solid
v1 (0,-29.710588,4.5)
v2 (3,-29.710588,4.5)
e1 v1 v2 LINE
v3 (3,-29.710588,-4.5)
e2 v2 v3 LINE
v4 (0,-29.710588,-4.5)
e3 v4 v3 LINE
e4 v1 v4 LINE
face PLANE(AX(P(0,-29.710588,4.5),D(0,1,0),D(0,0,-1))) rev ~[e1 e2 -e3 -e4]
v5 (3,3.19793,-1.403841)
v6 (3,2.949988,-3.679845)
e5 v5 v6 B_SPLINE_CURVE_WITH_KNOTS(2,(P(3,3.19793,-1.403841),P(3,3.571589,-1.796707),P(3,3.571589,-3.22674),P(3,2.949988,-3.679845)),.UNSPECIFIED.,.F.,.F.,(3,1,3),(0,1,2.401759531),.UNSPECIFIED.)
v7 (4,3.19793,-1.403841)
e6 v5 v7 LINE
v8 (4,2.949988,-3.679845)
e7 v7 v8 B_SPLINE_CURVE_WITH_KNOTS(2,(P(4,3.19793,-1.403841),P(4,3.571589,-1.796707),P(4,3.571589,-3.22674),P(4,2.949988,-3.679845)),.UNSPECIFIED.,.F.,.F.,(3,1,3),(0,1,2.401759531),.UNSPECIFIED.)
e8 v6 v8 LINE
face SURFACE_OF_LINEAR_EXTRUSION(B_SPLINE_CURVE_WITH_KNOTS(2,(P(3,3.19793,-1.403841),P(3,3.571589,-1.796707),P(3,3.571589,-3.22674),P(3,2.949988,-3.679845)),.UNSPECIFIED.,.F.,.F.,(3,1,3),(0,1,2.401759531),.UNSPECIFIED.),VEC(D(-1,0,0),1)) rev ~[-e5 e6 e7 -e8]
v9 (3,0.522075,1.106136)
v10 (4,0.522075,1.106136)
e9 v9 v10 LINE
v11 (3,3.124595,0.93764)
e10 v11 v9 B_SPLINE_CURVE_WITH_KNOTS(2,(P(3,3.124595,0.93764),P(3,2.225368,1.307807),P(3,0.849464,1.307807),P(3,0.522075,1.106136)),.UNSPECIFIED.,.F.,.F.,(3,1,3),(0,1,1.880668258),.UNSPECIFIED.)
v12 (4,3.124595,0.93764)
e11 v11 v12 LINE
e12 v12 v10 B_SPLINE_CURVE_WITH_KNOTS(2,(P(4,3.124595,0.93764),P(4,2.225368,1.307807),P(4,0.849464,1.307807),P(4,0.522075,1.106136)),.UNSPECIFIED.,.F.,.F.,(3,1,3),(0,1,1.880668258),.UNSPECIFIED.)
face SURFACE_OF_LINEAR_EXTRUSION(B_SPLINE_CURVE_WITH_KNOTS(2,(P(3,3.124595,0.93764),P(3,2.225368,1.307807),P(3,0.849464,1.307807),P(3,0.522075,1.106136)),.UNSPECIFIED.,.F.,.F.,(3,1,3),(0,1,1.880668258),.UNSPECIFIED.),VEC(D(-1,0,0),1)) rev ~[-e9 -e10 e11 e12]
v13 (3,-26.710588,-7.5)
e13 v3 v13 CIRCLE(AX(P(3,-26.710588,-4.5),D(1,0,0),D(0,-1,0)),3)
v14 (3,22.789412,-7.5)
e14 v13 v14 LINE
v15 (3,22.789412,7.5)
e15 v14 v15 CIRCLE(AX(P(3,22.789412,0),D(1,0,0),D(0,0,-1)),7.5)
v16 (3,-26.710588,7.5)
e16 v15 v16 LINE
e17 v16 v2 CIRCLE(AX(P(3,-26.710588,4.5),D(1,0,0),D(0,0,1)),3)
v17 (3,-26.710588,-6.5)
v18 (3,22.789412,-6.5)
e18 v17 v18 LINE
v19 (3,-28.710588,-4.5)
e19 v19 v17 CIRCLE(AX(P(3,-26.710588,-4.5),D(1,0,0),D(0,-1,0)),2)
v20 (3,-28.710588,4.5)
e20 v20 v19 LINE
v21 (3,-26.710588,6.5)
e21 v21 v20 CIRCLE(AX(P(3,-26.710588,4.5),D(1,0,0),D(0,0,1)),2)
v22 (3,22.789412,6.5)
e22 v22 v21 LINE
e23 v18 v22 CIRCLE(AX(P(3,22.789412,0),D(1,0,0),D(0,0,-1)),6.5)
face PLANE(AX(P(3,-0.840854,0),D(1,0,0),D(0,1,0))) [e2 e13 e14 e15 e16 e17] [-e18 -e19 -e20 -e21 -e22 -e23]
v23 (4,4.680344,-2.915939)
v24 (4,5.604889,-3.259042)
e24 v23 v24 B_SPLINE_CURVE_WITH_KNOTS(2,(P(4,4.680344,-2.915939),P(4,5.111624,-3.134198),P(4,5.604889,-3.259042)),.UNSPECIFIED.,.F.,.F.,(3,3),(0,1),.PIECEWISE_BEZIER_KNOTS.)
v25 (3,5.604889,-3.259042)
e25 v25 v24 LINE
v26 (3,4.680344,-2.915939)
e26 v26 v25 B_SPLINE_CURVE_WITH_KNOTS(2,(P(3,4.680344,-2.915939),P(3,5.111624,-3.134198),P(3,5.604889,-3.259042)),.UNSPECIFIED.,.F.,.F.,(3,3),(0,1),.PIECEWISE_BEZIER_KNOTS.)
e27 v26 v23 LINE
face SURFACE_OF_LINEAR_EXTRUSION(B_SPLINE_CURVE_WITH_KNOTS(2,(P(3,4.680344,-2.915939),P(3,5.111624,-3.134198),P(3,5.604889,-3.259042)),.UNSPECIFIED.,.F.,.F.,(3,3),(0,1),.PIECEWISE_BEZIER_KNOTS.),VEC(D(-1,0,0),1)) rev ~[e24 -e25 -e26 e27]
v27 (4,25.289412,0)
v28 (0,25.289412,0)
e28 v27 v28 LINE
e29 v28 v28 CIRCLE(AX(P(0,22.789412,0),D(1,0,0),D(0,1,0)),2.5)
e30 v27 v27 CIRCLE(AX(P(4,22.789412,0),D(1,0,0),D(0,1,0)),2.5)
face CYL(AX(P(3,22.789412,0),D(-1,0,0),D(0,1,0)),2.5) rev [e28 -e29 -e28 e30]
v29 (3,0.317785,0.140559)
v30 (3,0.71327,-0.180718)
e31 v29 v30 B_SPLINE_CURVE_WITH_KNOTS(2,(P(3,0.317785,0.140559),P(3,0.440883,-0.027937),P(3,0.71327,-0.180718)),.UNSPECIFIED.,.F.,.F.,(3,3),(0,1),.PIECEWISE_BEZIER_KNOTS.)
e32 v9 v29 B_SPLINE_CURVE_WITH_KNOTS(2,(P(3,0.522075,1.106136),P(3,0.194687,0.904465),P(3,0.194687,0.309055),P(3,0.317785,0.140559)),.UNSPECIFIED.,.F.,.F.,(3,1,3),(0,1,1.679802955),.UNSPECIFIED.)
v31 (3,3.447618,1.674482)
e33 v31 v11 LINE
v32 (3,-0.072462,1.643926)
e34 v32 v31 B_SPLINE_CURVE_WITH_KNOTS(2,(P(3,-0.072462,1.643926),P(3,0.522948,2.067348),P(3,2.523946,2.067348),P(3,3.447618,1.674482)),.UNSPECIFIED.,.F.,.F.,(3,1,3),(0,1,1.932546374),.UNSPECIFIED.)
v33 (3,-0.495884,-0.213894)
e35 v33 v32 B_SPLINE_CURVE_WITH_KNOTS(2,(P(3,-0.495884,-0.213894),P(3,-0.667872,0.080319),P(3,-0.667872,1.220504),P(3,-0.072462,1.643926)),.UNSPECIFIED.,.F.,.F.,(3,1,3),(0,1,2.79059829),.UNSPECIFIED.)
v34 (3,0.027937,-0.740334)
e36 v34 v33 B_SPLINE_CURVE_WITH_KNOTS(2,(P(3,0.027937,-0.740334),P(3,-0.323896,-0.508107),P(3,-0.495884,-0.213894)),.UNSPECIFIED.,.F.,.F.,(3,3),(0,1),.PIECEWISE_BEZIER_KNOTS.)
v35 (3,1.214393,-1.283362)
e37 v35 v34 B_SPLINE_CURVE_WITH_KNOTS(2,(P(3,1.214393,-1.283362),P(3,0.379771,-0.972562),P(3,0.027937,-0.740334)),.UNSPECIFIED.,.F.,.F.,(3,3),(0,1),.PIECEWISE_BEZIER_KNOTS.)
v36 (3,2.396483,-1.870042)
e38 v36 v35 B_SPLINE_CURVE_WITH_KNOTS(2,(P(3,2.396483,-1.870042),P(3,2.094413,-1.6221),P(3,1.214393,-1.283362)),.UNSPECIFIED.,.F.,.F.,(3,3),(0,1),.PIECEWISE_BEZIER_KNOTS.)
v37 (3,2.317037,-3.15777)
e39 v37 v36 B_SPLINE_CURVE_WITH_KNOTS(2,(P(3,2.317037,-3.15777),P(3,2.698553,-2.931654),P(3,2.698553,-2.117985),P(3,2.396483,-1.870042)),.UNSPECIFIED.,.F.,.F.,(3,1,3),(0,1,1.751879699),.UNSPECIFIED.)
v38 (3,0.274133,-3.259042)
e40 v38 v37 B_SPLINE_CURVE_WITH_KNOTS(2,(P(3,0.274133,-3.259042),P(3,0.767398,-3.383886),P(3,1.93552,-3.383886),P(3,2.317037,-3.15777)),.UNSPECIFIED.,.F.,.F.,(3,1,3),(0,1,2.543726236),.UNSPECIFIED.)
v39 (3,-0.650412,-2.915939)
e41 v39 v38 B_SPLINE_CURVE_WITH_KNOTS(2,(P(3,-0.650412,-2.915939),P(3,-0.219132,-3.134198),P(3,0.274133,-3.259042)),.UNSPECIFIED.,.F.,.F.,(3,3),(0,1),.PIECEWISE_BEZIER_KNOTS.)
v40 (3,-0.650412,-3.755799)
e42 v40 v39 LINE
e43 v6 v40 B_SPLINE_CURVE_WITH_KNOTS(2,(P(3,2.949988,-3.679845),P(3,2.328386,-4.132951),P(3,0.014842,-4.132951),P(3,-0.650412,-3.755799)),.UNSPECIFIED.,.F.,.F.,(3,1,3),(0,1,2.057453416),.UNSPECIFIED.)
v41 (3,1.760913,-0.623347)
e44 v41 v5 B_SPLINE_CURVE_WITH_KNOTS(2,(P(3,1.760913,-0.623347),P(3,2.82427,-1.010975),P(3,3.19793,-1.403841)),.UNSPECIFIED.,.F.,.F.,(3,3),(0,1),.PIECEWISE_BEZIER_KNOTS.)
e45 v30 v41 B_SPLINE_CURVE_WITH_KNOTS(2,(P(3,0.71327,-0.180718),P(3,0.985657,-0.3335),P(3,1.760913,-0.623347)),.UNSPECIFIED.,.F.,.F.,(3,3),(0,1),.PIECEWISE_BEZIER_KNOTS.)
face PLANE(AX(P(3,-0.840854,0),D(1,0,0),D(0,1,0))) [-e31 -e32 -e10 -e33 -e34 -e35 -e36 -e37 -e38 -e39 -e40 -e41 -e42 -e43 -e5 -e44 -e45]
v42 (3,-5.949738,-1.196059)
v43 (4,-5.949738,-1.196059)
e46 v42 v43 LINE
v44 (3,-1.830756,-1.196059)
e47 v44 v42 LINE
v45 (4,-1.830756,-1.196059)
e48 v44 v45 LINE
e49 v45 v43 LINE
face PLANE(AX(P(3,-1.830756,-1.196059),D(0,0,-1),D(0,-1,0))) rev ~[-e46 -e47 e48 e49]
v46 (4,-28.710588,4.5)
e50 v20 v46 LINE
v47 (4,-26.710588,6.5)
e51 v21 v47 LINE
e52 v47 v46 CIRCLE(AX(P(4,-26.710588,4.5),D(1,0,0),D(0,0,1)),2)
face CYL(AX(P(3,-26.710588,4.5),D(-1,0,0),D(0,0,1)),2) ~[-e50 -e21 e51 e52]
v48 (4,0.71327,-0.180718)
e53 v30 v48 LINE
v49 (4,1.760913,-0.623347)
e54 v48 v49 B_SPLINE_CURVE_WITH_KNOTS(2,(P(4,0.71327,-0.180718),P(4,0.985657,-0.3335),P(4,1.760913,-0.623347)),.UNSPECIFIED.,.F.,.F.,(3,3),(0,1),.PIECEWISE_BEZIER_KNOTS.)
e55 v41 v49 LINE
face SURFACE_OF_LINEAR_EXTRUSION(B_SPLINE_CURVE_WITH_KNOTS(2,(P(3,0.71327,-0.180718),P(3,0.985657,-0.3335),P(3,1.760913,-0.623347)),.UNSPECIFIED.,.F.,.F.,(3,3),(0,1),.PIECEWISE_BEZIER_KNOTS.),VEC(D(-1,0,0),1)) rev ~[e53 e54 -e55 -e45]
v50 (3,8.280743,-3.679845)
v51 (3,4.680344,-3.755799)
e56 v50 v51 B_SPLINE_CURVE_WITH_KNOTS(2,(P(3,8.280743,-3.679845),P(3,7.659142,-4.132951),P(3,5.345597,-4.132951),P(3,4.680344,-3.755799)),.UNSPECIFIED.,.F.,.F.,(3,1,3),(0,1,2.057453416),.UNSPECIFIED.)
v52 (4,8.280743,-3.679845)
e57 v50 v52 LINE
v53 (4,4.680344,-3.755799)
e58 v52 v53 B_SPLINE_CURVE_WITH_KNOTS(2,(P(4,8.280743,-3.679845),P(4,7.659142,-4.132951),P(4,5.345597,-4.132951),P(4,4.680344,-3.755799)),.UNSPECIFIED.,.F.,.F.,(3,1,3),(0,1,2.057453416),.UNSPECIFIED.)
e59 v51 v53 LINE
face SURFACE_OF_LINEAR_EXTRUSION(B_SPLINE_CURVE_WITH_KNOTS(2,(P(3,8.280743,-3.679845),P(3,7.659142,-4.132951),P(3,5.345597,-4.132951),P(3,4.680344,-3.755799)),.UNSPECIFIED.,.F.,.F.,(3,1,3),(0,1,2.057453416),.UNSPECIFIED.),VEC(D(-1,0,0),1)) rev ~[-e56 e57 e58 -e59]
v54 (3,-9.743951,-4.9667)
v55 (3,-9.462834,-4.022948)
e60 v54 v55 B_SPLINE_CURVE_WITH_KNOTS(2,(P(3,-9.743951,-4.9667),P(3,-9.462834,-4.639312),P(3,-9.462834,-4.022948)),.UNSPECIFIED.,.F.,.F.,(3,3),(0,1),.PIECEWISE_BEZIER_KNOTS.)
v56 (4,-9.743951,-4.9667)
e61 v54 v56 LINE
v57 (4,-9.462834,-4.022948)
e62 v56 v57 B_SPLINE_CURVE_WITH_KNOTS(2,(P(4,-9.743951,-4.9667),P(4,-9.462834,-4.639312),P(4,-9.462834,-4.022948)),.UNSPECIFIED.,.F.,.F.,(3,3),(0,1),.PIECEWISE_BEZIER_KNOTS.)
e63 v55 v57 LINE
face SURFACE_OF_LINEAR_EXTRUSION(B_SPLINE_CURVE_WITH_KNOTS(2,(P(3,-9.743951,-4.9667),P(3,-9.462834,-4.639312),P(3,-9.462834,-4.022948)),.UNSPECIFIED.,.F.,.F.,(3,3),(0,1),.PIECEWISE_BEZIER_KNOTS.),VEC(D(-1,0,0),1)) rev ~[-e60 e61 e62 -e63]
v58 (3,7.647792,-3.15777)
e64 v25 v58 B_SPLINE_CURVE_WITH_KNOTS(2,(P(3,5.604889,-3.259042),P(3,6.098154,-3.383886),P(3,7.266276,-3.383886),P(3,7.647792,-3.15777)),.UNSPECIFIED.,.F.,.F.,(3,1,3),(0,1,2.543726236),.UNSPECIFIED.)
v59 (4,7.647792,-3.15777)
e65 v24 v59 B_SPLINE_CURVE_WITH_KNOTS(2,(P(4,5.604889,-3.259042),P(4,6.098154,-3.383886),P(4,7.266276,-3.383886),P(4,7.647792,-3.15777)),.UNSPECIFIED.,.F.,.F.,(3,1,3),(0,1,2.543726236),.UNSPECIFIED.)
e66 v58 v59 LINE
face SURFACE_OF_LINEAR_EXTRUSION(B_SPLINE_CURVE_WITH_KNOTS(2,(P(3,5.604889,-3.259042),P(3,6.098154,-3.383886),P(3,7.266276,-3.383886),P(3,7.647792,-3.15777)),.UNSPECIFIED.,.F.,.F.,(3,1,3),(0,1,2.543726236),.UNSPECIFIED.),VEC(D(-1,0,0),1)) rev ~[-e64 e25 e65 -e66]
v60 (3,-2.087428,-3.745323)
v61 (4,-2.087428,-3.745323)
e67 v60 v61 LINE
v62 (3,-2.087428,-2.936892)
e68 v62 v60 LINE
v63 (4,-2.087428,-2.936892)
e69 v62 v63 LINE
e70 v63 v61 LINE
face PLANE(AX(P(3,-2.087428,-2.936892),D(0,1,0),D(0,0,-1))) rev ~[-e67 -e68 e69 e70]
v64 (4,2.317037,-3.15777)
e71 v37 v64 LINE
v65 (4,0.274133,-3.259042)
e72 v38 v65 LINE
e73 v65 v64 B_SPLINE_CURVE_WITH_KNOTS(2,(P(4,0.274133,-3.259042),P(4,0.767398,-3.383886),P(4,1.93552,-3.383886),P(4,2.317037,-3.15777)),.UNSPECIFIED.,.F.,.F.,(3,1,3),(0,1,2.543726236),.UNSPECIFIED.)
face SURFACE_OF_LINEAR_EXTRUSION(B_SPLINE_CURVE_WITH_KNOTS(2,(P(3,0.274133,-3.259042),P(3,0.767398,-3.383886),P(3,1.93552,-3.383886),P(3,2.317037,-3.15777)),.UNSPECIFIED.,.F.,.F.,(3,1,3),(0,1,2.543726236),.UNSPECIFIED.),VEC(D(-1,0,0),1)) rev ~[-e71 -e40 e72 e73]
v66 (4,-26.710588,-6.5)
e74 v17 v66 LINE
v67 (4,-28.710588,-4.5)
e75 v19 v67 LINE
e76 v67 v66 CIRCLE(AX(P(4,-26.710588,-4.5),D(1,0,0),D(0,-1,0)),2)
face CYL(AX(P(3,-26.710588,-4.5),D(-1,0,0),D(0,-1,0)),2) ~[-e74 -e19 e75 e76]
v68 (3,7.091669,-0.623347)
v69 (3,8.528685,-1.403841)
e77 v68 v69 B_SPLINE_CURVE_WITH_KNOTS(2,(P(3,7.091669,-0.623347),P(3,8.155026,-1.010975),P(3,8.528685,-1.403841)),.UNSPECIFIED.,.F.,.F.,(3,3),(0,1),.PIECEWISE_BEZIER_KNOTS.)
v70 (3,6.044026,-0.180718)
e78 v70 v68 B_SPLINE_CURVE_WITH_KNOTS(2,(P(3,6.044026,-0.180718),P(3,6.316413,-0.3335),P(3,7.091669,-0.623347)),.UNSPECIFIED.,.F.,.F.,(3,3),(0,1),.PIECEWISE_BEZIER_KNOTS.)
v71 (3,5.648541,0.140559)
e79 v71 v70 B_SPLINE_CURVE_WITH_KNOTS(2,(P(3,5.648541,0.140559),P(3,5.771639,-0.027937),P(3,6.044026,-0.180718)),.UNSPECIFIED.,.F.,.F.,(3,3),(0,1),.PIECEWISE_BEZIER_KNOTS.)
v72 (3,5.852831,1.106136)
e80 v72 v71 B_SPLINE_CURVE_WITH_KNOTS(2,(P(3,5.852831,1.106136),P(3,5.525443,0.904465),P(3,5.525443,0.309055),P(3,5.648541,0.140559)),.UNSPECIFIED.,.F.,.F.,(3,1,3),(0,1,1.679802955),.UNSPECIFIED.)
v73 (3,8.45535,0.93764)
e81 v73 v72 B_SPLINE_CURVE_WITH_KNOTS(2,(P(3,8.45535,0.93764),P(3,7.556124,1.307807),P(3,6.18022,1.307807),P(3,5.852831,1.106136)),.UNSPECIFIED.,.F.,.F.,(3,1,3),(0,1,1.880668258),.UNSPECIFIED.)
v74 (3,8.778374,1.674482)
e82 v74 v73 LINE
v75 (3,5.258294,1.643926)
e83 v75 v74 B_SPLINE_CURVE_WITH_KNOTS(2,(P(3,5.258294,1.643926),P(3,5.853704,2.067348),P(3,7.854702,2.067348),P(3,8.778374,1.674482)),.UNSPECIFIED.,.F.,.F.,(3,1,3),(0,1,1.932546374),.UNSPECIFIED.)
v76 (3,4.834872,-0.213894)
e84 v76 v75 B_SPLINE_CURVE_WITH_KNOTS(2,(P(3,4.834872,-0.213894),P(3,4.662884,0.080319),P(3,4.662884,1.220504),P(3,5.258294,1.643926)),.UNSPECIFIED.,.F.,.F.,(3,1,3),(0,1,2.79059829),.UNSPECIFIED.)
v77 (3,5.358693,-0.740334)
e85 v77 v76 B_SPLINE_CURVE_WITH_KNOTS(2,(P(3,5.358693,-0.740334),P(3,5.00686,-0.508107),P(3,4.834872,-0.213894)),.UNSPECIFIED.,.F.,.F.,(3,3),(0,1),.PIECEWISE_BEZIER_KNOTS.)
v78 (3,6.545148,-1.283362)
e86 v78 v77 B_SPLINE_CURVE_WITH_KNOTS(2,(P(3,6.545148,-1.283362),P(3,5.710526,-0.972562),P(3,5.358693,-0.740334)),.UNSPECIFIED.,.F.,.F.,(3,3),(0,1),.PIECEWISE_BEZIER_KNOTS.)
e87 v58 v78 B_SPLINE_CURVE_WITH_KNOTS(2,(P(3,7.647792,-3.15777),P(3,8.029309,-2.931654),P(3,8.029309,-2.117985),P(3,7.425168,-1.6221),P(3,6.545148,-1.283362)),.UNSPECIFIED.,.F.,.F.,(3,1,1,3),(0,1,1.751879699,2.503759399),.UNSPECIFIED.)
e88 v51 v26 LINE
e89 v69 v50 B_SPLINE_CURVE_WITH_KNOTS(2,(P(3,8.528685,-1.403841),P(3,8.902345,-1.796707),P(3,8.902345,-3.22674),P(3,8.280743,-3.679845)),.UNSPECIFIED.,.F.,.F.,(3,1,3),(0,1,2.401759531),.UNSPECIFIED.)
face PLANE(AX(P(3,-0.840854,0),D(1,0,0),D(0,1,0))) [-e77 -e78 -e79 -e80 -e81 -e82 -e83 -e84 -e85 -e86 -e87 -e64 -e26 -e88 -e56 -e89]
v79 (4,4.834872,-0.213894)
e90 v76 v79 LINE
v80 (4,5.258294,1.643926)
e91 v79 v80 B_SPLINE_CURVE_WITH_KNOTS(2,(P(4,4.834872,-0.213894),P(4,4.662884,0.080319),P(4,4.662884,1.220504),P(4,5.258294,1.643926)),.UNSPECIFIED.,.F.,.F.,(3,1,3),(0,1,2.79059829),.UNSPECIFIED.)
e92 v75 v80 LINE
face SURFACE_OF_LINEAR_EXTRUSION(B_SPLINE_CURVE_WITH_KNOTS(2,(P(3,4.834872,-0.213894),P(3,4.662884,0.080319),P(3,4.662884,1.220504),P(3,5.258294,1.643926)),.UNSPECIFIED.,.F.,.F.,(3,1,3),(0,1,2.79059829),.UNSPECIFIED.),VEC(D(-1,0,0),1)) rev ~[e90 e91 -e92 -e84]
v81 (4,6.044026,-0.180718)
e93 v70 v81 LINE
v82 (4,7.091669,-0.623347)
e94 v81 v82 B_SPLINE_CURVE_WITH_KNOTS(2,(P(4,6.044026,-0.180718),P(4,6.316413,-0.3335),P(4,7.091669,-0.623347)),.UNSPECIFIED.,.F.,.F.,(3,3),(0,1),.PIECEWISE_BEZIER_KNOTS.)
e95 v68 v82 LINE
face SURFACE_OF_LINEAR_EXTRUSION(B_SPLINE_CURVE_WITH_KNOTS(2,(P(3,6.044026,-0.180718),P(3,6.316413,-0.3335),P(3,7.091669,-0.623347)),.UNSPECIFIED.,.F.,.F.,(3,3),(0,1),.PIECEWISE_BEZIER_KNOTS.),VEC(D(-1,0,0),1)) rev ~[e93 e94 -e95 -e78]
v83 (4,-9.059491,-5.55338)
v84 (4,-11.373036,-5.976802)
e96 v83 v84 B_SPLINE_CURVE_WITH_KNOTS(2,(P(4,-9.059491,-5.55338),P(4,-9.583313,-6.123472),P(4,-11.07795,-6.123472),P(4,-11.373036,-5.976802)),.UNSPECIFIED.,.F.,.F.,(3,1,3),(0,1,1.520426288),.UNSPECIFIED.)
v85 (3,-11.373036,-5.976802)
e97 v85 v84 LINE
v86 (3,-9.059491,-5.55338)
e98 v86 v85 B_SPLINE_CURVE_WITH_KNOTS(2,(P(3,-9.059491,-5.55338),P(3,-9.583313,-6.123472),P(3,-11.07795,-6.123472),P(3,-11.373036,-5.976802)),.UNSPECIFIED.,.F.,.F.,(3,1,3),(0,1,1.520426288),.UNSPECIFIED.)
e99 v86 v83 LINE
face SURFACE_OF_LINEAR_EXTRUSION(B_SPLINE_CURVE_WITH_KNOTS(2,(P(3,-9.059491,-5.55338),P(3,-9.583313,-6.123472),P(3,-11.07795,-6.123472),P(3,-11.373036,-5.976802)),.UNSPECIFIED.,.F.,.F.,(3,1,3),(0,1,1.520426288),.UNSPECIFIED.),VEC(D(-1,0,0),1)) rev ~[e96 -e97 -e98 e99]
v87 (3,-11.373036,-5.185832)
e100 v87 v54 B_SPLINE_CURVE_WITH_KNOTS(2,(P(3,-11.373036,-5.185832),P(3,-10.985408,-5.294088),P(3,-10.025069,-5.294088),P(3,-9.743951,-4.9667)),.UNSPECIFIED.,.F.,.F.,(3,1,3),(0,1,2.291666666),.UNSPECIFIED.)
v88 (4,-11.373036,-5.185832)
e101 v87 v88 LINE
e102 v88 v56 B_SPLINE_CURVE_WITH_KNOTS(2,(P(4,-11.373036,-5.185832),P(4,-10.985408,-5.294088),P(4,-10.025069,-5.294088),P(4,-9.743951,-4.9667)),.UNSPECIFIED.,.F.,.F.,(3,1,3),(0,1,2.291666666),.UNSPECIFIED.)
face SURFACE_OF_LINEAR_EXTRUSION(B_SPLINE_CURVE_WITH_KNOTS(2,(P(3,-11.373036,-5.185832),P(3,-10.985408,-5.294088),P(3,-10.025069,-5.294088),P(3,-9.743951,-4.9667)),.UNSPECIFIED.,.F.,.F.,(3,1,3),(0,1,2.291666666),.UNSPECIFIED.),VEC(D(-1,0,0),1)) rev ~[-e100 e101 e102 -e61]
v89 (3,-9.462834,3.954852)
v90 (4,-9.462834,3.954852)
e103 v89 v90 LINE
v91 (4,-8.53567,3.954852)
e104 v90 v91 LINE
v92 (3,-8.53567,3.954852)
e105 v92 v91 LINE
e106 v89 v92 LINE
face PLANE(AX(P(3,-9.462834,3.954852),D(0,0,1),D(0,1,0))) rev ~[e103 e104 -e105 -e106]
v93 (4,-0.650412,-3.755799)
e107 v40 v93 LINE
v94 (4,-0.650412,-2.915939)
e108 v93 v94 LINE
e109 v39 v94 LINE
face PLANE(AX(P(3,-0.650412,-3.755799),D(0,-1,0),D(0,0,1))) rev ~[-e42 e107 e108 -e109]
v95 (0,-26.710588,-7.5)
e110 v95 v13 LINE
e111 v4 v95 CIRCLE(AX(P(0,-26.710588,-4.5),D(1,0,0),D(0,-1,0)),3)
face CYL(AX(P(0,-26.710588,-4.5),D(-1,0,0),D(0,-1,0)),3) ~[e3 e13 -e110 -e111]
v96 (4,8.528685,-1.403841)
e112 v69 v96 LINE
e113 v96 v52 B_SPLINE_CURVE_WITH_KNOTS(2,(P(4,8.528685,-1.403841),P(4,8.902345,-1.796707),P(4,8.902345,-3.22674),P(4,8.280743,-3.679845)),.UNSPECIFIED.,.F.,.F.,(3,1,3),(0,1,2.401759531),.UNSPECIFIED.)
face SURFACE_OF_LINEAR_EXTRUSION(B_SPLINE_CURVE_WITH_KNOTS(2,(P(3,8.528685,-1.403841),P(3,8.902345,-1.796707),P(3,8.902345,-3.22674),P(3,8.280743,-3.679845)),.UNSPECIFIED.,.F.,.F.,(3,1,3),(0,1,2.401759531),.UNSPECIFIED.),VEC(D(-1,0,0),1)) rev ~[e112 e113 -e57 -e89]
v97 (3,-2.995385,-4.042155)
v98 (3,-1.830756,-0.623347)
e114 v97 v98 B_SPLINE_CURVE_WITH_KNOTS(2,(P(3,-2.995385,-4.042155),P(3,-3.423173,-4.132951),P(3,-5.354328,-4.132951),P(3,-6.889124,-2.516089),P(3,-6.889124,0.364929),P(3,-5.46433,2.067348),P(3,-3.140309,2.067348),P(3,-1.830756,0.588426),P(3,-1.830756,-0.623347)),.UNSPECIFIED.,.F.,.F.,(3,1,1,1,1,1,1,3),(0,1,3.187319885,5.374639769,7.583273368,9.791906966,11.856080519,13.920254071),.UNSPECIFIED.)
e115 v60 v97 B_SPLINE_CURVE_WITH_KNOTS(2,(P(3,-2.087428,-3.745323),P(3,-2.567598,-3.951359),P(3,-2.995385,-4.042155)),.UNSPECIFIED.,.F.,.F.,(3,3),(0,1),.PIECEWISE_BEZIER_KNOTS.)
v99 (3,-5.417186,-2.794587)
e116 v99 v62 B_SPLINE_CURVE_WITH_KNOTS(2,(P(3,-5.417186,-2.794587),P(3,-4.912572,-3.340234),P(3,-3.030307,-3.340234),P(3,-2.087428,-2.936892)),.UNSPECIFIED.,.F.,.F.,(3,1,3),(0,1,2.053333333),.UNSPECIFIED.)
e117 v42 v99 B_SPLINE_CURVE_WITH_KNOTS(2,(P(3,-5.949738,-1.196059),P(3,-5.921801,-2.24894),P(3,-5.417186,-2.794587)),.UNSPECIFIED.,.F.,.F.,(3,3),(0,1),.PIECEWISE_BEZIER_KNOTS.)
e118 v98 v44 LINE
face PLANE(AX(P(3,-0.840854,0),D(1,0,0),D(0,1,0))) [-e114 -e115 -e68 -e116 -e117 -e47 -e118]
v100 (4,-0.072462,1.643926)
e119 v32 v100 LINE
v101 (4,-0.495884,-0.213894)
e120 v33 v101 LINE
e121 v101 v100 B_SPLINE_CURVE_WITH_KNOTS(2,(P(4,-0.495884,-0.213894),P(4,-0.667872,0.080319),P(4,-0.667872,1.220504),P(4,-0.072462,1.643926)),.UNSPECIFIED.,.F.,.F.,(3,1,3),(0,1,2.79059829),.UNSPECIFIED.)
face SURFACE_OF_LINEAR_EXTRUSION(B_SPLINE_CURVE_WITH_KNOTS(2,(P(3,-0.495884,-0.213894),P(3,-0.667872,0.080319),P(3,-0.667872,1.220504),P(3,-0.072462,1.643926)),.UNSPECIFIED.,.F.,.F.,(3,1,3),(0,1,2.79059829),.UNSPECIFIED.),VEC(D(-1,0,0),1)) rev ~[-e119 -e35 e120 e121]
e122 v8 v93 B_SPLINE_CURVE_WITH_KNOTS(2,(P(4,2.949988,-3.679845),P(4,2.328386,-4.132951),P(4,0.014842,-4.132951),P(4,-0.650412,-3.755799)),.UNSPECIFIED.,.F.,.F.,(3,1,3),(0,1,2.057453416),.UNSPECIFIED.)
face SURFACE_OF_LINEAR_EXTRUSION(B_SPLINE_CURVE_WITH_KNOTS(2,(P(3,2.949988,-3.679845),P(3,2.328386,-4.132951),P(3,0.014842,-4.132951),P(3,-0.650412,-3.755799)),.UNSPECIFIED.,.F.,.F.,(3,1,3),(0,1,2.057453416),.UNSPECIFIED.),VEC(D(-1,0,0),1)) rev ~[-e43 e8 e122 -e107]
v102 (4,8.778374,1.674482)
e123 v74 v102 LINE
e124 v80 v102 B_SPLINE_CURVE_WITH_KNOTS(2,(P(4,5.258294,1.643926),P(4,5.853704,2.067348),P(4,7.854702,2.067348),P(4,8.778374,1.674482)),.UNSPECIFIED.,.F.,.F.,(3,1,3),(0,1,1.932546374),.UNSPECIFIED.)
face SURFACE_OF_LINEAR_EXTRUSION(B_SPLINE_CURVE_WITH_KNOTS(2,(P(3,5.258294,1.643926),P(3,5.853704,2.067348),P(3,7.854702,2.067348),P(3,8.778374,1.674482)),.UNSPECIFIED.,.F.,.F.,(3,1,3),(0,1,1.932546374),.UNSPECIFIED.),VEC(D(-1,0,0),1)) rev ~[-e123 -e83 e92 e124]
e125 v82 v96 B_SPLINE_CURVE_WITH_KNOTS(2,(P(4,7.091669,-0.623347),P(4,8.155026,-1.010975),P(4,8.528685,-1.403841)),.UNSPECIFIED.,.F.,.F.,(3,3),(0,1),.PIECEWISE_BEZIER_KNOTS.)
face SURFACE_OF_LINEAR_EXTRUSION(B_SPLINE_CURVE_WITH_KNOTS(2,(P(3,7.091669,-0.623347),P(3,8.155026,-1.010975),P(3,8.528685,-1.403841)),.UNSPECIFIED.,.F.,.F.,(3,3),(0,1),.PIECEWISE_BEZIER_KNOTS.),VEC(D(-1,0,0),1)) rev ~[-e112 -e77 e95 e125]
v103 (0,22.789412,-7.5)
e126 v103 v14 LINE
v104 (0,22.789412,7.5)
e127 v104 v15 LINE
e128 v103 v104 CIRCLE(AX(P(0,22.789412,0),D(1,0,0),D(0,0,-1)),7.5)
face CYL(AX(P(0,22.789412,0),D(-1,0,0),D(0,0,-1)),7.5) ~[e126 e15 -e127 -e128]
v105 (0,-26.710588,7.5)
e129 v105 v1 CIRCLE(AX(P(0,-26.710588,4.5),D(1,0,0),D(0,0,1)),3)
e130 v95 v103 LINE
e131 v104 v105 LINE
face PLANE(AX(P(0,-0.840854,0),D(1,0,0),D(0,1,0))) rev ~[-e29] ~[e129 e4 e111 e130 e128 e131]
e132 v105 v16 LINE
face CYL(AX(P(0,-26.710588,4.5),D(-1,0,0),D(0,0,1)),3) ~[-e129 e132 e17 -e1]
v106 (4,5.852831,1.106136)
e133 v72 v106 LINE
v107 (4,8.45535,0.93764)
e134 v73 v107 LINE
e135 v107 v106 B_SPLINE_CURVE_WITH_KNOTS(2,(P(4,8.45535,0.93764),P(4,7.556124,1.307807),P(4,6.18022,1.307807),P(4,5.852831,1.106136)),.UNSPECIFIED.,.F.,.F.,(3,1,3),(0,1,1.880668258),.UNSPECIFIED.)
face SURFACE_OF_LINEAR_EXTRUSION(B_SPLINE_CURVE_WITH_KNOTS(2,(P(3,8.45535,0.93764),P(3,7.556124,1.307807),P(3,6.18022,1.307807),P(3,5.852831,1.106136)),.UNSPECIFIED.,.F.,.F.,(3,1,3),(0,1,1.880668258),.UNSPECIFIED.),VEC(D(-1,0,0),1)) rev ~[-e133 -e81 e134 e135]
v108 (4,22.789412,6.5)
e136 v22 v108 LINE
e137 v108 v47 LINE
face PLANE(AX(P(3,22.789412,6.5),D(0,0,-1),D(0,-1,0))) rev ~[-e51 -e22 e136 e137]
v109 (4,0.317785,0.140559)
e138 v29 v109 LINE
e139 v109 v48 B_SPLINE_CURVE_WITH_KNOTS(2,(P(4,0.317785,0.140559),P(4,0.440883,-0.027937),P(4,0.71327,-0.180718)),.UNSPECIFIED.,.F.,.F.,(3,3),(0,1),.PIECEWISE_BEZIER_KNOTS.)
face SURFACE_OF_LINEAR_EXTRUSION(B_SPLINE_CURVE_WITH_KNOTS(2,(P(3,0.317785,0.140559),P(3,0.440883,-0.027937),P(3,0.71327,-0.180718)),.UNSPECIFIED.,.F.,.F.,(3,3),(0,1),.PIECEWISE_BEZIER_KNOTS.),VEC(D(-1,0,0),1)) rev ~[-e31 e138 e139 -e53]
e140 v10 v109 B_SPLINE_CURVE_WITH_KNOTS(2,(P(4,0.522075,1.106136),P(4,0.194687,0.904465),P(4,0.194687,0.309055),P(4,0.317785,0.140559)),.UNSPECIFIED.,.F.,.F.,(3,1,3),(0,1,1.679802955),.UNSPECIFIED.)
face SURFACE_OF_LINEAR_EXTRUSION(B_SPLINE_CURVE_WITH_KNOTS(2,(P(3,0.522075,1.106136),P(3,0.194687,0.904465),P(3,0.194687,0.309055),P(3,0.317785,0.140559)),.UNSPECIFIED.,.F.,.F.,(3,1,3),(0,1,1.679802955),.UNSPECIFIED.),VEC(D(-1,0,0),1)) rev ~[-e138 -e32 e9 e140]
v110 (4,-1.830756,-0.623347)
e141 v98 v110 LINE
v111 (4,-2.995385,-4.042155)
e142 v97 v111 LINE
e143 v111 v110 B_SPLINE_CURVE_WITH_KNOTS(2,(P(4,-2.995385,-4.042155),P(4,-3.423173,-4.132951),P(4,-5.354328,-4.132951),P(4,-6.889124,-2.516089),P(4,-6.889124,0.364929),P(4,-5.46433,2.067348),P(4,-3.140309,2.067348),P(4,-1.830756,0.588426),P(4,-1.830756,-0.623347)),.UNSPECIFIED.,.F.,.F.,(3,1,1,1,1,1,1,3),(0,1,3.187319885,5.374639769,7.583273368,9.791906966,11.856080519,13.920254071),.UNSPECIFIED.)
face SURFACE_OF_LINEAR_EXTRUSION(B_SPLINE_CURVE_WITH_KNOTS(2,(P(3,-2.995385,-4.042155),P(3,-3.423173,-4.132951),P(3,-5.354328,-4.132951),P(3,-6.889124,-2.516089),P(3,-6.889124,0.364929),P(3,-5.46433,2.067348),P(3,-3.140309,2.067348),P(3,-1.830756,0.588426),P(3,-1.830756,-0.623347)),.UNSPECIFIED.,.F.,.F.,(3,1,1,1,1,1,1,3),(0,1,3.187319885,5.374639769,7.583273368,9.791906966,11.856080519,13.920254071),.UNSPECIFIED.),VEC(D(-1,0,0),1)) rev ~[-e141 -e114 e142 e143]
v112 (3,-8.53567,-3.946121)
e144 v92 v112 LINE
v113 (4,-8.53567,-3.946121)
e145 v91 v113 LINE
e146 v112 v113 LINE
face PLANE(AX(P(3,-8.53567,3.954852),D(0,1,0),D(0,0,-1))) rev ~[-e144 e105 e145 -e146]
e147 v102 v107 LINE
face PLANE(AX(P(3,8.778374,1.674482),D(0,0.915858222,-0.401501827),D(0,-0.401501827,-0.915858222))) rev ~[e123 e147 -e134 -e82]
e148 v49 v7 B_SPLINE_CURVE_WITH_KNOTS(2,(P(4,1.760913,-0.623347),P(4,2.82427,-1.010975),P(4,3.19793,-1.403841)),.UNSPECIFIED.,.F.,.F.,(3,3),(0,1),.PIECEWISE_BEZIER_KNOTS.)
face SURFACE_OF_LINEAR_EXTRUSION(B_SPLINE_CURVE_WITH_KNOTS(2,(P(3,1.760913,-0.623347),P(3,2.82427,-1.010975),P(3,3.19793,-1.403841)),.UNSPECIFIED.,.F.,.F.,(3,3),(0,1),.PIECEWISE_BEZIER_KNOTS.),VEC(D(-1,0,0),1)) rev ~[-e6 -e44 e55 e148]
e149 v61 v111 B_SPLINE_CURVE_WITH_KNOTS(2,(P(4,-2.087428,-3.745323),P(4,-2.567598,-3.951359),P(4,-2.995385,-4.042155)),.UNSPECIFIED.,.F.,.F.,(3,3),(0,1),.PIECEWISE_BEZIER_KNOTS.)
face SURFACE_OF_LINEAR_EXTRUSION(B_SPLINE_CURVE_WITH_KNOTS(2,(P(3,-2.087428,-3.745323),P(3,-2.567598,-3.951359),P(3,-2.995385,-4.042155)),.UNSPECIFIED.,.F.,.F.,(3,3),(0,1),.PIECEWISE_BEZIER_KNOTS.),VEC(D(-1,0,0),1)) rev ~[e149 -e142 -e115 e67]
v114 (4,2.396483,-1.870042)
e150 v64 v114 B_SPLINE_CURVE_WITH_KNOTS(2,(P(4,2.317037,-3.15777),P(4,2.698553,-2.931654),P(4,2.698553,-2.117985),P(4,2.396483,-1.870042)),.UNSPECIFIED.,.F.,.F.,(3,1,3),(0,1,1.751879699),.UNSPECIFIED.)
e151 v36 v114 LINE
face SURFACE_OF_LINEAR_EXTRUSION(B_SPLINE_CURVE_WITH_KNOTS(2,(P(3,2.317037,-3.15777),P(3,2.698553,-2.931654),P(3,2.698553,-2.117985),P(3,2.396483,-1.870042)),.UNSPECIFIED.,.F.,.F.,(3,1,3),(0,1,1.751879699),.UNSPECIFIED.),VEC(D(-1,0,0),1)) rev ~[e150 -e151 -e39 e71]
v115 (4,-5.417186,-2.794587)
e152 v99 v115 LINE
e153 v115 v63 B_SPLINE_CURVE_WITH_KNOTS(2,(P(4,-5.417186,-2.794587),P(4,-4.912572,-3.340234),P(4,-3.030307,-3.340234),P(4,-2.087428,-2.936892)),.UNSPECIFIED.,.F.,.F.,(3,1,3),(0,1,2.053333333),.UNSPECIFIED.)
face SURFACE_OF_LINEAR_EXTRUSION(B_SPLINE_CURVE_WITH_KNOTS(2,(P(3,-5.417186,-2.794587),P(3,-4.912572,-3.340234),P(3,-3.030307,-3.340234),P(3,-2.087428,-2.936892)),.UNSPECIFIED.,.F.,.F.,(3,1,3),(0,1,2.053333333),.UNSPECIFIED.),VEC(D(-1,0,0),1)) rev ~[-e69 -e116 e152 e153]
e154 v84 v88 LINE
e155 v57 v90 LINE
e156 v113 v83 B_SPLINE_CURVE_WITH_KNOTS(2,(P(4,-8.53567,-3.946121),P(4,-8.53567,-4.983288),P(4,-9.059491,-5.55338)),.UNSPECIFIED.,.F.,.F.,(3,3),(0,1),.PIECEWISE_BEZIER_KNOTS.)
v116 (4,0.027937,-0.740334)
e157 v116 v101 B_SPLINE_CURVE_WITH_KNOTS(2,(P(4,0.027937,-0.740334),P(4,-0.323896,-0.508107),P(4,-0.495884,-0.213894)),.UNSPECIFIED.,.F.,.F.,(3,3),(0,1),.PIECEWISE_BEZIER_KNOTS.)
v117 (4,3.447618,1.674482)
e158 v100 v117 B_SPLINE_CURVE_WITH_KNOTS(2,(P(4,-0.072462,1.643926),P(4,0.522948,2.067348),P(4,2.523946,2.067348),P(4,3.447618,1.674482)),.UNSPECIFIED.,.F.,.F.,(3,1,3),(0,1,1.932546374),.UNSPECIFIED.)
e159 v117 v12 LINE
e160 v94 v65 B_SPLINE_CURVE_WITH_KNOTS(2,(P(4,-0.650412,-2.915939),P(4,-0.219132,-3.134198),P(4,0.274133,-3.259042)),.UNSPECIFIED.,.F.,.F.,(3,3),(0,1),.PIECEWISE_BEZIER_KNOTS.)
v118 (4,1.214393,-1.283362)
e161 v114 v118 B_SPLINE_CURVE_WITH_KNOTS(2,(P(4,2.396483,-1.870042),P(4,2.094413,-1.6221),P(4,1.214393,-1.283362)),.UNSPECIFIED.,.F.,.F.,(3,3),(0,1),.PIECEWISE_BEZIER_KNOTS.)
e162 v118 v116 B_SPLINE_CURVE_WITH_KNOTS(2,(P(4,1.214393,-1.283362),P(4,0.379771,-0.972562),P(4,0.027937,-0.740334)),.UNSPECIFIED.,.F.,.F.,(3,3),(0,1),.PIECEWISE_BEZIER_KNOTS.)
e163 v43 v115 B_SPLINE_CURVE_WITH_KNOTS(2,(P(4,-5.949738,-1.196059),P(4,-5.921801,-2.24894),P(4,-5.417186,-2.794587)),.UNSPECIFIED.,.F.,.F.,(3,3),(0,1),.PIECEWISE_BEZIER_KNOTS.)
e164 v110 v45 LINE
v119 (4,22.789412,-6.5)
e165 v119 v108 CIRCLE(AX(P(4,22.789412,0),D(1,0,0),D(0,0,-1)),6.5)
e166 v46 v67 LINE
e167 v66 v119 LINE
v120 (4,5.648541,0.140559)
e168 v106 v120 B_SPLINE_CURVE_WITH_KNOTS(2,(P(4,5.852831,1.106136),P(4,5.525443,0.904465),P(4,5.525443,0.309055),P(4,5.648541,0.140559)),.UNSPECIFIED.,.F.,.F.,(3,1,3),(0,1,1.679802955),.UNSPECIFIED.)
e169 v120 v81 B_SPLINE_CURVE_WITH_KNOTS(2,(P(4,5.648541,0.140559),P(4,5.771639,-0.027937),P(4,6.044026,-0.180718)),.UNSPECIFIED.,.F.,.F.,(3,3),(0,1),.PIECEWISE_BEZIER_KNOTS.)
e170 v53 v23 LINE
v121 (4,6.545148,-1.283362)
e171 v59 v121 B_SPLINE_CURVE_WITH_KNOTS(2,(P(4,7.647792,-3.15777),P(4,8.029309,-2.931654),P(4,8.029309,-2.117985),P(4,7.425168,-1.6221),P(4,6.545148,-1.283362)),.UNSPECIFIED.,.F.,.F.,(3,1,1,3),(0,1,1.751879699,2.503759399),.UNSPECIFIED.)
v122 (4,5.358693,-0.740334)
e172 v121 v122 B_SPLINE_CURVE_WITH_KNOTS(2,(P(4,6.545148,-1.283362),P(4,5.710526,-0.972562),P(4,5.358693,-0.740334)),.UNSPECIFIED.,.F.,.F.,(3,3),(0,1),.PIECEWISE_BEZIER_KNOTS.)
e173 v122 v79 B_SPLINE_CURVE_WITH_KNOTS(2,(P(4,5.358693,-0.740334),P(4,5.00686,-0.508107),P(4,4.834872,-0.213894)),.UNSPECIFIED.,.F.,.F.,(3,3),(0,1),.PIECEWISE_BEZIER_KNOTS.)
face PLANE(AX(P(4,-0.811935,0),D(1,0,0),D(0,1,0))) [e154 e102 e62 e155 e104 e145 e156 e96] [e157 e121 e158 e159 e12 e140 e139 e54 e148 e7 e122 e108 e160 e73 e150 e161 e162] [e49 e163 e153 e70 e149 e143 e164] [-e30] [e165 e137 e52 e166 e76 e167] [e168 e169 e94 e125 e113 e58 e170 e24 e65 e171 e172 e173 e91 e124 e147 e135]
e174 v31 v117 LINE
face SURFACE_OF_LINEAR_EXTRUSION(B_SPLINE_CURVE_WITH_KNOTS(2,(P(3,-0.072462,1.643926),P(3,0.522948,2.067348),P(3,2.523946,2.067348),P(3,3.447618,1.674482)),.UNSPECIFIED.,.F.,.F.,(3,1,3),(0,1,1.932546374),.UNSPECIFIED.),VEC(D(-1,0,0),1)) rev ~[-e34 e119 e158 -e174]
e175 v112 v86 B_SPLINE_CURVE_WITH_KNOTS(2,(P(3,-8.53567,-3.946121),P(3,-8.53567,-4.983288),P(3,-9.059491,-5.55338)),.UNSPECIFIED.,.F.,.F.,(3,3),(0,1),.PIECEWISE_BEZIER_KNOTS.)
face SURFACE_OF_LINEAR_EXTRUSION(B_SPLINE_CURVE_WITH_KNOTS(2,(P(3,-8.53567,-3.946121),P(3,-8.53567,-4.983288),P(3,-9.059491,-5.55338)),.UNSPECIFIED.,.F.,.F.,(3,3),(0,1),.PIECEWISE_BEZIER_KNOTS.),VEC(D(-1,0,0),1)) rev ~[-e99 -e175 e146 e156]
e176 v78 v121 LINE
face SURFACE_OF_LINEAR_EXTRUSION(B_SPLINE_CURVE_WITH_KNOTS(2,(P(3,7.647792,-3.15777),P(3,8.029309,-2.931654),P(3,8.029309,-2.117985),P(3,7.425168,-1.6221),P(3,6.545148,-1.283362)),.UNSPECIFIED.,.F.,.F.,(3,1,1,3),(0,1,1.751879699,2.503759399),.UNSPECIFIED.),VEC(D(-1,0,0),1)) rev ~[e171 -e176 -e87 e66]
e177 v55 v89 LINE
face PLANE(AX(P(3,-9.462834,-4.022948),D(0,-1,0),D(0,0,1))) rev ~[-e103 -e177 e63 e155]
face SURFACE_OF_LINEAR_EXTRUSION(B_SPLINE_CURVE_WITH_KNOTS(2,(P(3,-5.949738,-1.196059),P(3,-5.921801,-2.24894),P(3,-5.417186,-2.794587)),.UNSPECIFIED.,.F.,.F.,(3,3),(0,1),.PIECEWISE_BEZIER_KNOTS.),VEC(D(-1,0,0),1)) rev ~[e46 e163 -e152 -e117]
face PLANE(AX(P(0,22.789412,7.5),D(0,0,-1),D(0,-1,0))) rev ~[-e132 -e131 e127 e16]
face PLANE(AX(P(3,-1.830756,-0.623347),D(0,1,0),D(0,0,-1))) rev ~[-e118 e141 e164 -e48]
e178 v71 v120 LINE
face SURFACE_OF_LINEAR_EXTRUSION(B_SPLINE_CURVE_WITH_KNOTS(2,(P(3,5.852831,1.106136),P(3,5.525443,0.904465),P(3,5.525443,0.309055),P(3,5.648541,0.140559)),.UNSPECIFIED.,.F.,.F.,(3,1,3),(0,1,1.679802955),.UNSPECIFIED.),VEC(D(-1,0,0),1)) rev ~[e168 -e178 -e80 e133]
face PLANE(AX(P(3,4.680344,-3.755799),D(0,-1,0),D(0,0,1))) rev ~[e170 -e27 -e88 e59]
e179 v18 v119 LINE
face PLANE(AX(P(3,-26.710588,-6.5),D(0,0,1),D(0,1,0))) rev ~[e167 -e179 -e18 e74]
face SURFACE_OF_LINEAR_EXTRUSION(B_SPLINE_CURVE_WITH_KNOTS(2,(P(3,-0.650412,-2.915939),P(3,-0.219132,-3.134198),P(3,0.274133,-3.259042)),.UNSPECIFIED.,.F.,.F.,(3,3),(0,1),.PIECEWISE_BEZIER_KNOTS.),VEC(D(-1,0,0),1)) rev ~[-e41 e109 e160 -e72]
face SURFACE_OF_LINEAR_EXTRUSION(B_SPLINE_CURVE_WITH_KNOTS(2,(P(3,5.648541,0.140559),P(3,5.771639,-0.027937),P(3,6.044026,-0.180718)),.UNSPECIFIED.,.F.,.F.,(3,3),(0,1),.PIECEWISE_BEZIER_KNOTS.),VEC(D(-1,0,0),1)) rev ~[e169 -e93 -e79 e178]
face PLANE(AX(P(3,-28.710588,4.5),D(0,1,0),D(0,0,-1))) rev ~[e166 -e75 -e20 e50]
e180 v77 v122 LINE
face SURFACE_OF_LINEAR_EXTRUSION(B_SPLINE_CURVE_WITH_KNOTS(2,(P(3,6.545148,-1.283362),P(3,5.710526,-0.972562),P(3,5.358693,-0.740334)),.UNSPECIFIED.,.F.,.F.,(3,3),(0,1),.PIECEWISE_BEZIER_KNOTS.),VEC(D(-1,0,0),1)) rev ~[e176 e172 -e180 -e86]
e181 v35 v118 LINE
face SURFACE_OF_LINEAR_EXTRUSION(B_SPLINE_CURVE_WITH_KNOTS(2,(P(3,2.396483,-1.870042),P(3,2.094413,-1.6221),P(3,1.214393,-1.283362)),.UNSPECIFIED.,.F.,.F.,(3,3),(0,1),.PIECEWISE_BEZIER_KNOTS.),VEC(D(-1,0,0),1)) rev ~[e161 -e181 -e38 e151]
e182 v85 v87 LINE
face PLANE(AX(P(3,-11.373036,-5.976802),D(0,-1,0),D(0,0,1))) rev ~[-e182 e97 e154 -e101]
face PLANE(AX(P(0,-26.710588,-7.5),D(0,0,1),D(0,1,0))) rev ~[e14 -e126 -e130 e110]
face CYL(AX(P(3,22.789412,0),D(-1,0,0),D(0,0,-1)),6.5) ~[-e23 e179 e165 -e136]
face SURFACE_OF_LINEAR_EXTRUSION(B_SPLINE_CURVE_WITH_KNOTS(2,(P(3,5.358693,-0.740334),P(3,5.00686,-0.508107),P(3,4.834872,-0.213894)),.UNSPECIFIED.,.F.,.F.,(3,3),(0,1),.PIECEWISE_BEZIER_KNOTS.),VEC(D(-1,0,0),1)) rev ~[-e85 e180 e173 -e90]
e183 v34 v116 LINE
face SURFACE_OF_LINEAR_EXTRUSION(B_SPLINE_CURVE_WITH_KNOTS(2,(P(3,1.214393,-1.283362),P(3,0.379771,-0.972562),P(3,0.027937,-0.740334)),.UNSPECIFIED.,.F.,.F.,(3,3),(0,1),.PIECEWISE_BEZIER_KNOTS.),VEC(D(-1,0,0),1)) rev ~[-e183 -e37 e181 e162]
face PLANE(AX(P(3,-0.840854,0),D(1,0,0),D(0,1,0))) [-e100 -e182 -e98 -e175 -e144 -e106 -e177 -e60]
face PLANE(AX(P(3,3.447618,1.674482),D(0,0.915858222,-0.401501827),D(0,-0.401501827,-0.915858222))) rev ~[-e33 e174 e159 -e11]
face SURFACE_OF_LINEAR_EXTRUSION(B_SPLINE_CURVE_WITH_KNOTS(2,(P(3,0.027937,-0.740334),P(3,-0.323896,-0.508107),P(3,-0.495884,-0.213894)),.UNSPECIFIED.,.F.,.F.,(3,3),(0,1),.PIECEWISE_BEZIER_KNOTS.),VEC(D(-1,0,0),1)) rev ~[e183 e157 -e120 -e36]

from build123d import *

# Parameters (mm, degrees)
F0_R     = 2.5
F1_DEPTH = 3
F2_R     = 2.5
F3_DEPTH = 1


# Not quite as in the source:
# - a feature names something its author has since deleted; it is built from what else it names


with BuildPart() as f1:
    # F0 (on Right) → F1 (new body)
    with BuildSketch(Plane.YZ):
        with BuildLine():
            Line((22.7894122154, 7.5), (-26.7105877846, 7.5))
            ThreePointArc((-26.7105877846, 7.5), (-28.8319081282, 6.6213203436), (-29.7105877846, 4.5))
            Line((-29.7105877846, 4.5), (-29.7105877846, -4.5))
            ThreePointArc((-29.7105877846, -4.5), (-28.8319081282, -6.6213203436), (-26.7105877846, -7.5))
            Line((-26.7105877846, -7.5), (22.7894122154, -7.5))
            ThreePointArc((22.7894122154, -7.5), (30.2894122154, 0), (22.7894122154, 7.5))
        make_face()
        with Locations((22.7894122154, 0)):
            Circle(F0_R, mode=Mode.SUBTRACT)
    extrude(amount=F1_DEPTH)

    # F2 (on face) → F3 (join)
    with BuildSketch(Plane.YZ.offset(3)):
        with BuildLine():
            Line((22.7894122154, 6.5), (-26.7105877846, 6.5))
            ThreePointArc((-26.7105877846, 6.5), (-28.124801347, 5.9142135624), (-28.7105877846, 4.5))
            Line((-28.7105877846, 4.5), (-28.7105877846, -4.5))
            ThreePointArc((-28.7105877846, -4.5), (-28.124801347, -5.9142135624), (-26.7105877846, -6.5))
            Line((-26.7105877846, -6.5), (22.7894122154, -6.5))
            ThreePointArc((22.7894122154, -6.5), (29.2894122154, 0), (22.7894122154, 6.5))
        make_face()
        with BuildLine():
            add(Edge.make_bspline(
                [(-9.0594911449, -5.5533798952), (-9.5833125468, -6.1234721876), (-10.5663507109, -6.1234721876)],
                knots=[0, 0, 0, 1, 1, 1], degree=2))
            add(Edge.make_bspline(
                [(-10.5663507109, -6.1234721876), (-11.0779496134, -6.1234721876), (-11.3730356697, -5.9768021951)],
                knots=[0, 0, 0, 1, 1, 1], degree=2))
            Line((-11.3730356697, -5.9768021951), (-11.3730356697, -5.1858318783))
            add(Edge.make_bspline(
                [(-11.3730356697, -5.1858318783), (-10.9854078324, -5.2940883013), (-10.5663507109, -5.2940883013)],
                knots=[0, 0, 0, 1, 1, 1], degree=2))
            add(Edge.make_bspline(
                [(-10.5663507109, -5.2940883013), (-10.0250685957, -5.2940883013), (-9.74395111, -4.9666999252)],
                knots=[0, 0, 0, 1, 1, 1], degree=2))
            add(Edge.make_bspline(
                [(-9.74395111, -4.9666999252), (-9.4628336243, -4.639311549), (-9.4628336243, -4.0229483662)],
                knots=[0, 0, 0, 1, 1, 1], degree=2))
            Line((-9.4628336243, -4.0229483662), (-9.4628336243, 3.9548515839))
            Line((-9.4628336243, 3.9548515839), (-8.5356697431, 3.9548515839))
            Line((-8.5356697431, 3.9548515839), (-8.5356697431, -3.9461212272))
            add(Edge.make_bspline(
                [(-8.5356697431, -3.9461212272), (-8.5356697431, -4.9832876029), (-9.0594911449, -5.5533798952)],
                knots=[0, 0, 0, 1, 1, 1], degree=2))
        make_face(mode=Mode.SUBTRACT)
        with BuildLine():
            add(Edge.make_bspline(
                [(-2.9953853829, -4.0421551509), (-3.4231728611, -4.1329508606), (-4.0290596159, -4.1329508606)],
                knots=[0, 0, 0, 1, 1, 1], degree=2))
            add(Edge.make_bspline(
                [(-4.0290596159, -4.1329508606), (-5.3543277625, -4.1329508606), (-6.1217261162, -3.3245198304)],
                knots=[0, 0, 0, 1, 1, 1], degree=2))
            add(Edge.make_bspline(
                [(-6.1217261162, -3.3245198304), (-6.8891244699, -2.5160888002), (-6.8891244699, -1.0825642305)],
                knots=[0, 0, 0, 1, 1, 1], degree=2))
            add(Edge.make_bspline(
                [(-6.8891244699, -1.0825642305), (-6.8891244699, 0.36492891), (-6.1767273634, 1.216138688)],
                knots=[0, 0, 0, 1, 1, 1], degree=2))
            add(Edge.make_bspline(
                [(-6.1767273634, 1.216138688), (-5.4643302569, 2.067348466), (-4.2630331754, 2.067348466)],
                knots=[0, 0, 0, 1, 1, 1], degree=2))
            add(Edge.make_bspline(
                [(-4.2630331754, 2.067348466), (-3.1403093041, 2.067348466), (-2.4855325518, 1.3278872537)],
                knots=[0, 0, 0, 1, 1, 1], degree=2))
            add(Edge.make_bspline(
                [(-2.4855325518, 1.3278872537), (-1.8307557995, 0.5884260414), (-1.8307557995, -0.6233474682)],
                knots=[0, 0, 0, 1, 1, 1], degree=2))
            Line((-1.8307557995, -0.6233474682), (-1.8307557995, -1.1960588675))
            Line((-1.8307557995, -1.1960588675), (-5.9497380893, -1.1960588675))
            add(Edge.make_bspline(
                [(-5.9497380893, -1.1960588675), (-5.9218009479, -2.2489398853), (-5.4171863308, -2.7945871788)],
                knots=[0, 0, 0, 1, 1, 1], degree=2))
            add(Edge.make_bspline(
                [(-5.4171863308, -2.7945871788), (-4.9125717136, -3.3402344724), (-3.9958842604, -3.3402344724)],
                knots=[0, 0, 0, 1, 1, 1], degree=2))
            add(Edge.make_bspline(
                [(-3.9958842604, -3.3402344724), (-3.0303068097, -3.3402344724), (-2.0874282864, -2.936891993)],
                knots=[0, 0, 0, 1, 1, 1], degree=2))
            Line((-2.0874282864, -2.936891993), (-2.0874282864, -3.7453230232))
            add(Edge.make_bspline(
                [(-2.0874282864, -3.7453230232), (-2.5675979047, -3.9513594413), (-2.9953853829, -4.0421551509)],
                knots=[0, 0, 0, 1, 1, 1], degree=2))
        make_face(mode=Mode.SUBTRACT)
        with BuildLine():
            add(Edge.make_bspline(
                [(3.1979296583, -1.4038413569), (3.5715889249, -1.7967074083), (3.5715889249, -2.3921177351)],
                knots=[0, 0, 0, 1, 1, 1], degree=2))
            add(Edge.make_bspline(
                [(3.5715889249, -2.3921177351), (3.5715889249, -3.2267398354), (2.9499875281, -3.679845348)],
                knots=[0, 0, 0, 1, 1, 1], degree=2))
            add(Edge.make_bspline(
                [(2.9499875281, -3.679845348), (2.3283861312, -4.1329508606), (1.2039161886, -4.1329508606)],
                knots=[0, 0, 0, 1, 1, 1], degree=2))
            add(Edge.make_bspline(
                [(1.2039161886, -4.1329508606), (0.0148416064, -4.1329508606), (-0.650411574, -3.7557994512)],
                knots=[0, 0, 0, 1, 1, 1], degree=2))
            Line((-0.650411574, -3.7557994512), (-0.650411574, -2.9159391369))
            add(Edge.make_bspline(
                [(-0.650411574, -2.9159391369), (-0.2191319531, -3.1341980544), (0.2741332003, -3.2590421552)],
                knots=[0, 0, 0, 1, 1, 1], degree=2))
            add(Edge.make_bspline(
                [(0.2741332003, -3.2590421552), (0.7673983537, -3.3838862559), (1.226615116, -3.3838862559)],
                knots=[0, 0, 0, 1, 1, 1], degree=2))
            add(Edge.make_bspline(
                [(1.226615116, -3.3838862559), (1.9355200798, -3.3838862559), (2.3170366675, -3.1577700175)],
                knots=[0, 0, 0, 1, 1, 1], degree=2))
            add(Edge.make_bspline(
                [(2.3170366675, -3.1577700175), (2.6985532552, -2.931653779), (2.6985532552, -2.4671988027)],
                knots=[0, 0, 0, 1, 1, 1], degree=2))
            add(Edge.make_bspline(
                [(2.6985532552, -2.4671988027), (2.6985532552, -2.1179845348), (2.3964829134, -1.8700424046)],
                knots=[0, 0, 0, 1, 1, 1], degree=2))
            add(Edge.make_bspline(
                [(2.3964829134, -1.8700424046), (2.0944125717, -1.6221002744), (1.2143926166, -1.2833624345)],
                knots=[0, 0, 0, 1, 1, 1], degree=2))
            add(Edge.make_bspline(
                [(1.2143926166, -1.2833624345), (0.3797705163, -0.9725617361), (0.0279371414, -0.7403342479)],
                knots=[0, 0, 0, 1, 1, 1], degree=2))
            add(Edge.make_bspline(
                [(0.0279371414, -0.7403342479), (-0.3238962335, -0.5081067598), (-0.4958842604, -0.2138937391)],
                knots=[0, 0, 0, 1, 1, 1], degree=2))
            add(Edge.make_bspline(
                [(-0.4958842604, -0.2138937391), (-0.6678722874, 0.0803192816), (-0.6678722874, 0.4888999751)],
                knots=[0, 0, 0, 1, 1, 1], degree=2))
            add(Edge.make_bspline(
                [(-0.6678722874, 0.4888999751), (-0.6678722874, 1.2205038663), (-0.0724619606, 1.6439261661)],
                knots=[0, 0, 0, 1, 1, 1], degree=2))
            add(Edge.make_bspline(
                [(-0.0724619606, 1.6439261661), (0.5229483662, 2.067348466), (1.5583686705, 2.067348466)],
                knots=[0, 0, 0, 1, 1, 1], degree=2))
            add(Edge.make_bspline(
                [(1.5583686705, 2.067348466), (2.5239461212, 2.067348466), (3.4476178598, 1.6744824146)],
                knots=[0, 0, 0, 1, 1, 1], degree=2))
            Line((3.4476178598, 1.6744824146), (3.124594662, 0.9376403093))
            add(Edge.make_bspline(
                [(3.124594662, 0.9376403093), (2.2253679222, 1.3078074333), (1.4937640309, 1.3078074333)],
                knots=[0, 0, 0, 1, 1, 1], degree=2))
            add(Edge.make_bspline(
                [(1.4937640309, 1.3078074333), (0.8494637067, 1.3078074333), (0.5220753305, 1.1061361936)],
                knots=[0, 0, 0, 1, 1, 1], degree=2))
            add(Edge.make_bspline(
                [(0.5220753305, 1.1061361936), (0.1946869544, 0.9044649539), (0.1946869544, 0.5500124719)],
                knots=[0, 0, 0, 1, 1, 1], degree=2))
            add(Edge.make_bspline(
                [(0.1946869544, 0.5500124719), (0.1946869544, 0.3090546271), (0.3177849838, 0.1405587428)],
                knots=[0, 0, 0, 1, 1, 1], degree=2))
            add(Edge.make_bspline(
                [(0.3177849838, 0.1405587428), (0.4408830132, -0.0279371414), (0.7132701422, -0.1807183836)],
                knots=[0, 0, 0, 1, 1, 1], degree=2))
            add(Edge.make_bspline(
                [(0.7132701422, -0.1807183836), (0.9856572711, -0.3334996258), (1.7609129459, -0.6233474682)],
                knots=[0, 0, 0, 1, 1, 1], degree=2))
            add(Edge.make_bspline(
                [(1.7609129459, -0.6233474682), (2.8242703916, -1.0109753056), (3.1979296583, -1.4038413569)],
                knots=[0, 0, 0, 1, 1, 1], degree=2))
        make_face(mode=Mode.SUBTRACT)
        with BuildLine():
            add(Edge.make_bspline(
                [(8.5286854577, -1.4038413569), (8.9023447244, -1.7967074083), (8.9023447244, -2.3921177351)],
                knots=[0, 0, 0, 1, 1, 1], degree=2))
            add(Edge.make_bspline(
                [(8.9023447244, -2.3921177351), (8.9023447244, -3.2267398354), (8.2807433275, -3.679845348)],
                knots=[0, 0, 0, 1, 1, 1], degree=2))
            add(Edge.make_bspline(
                [(8.2807433275, -3.679845348), (7.6591419307, -4.1329508606), (6.534671988, -4.1329508606)],
                knots=[0, 0, 0, 1, 1, 1], degree=2))
            add(Edge.make_bspline(
                [(6.534671988, -4.1329508606), (5.3455974058, -4.1329508606), (4.6803442255, -3.7557994512)],
                knots=[0, 0, 0, 1, 1, 1], degree=2))
            Line((4.6803442255, -3.7557994512), (4.6803442255, -2.9159391369))
            add(Edge.make_bspline(
                [(4.6803442255, -2.9159391369), (5.1116238463, -3.1341980544), (5.6048889998, -3.2590421552)],
                knots=[0, 0, 0, 1, 1, 1], degree=2))
            add(Edge.make_bspline(
                [(5.6048889998, -3.2590421552), (6.0981541532, -3.3838862559), (6.5573709154, -3.3838862559)],
                knots=[0, 0, 0, 1, 1, 1], degree=2))
            add(Edge.make_bspline(
                [(6.5573709154, -3.3838862559), (7.2662758793, -3.3838862559), (7.6477924669, -3.1577700175)],
                knots=[0, 0, 0, 1, 1, 1], degree=2))
            add(Edge.make_bspline(
                [(7.6477924669, -3.1577700175), (8.0293090546, -2.931653779), (8.0293090546, -2.4671988027)],
                knots=[0, 0, 0, 1, 1, 1], degree=2))
            add(Edge.make_bspline(
                [(8.0293090546, -2.4671988027), (8.0293090546, -2.1179845348), (7.7272387129, -1.8700424046)],
                knots=[0, 0, 0, 1, 1, 1], degree=2))
            add(Edge.make_bspline(
                [(7.7272387129, -1.8700424046), (7.4251683712, -1.6221002744), (6.5451484161, -1.2833624345)],
                knots=[0, 0, 0, 1, 1, 1], degree=2))
            add(Edge.make_bspline(
                [(6.5451484161, -1.2833624345), (5.7105263158, -0.9725617361), (5.3586929409, -0.7403342479)],
                knots=[0, 0, 0, 1, 1, 1], degree=2))
            add(Edge.make_bspline(
                [(5.3586929409, -0.7403342479), (5.006859566, -0.5081067598), (4.834871539, -0.2138937391)],
                knots=[0, 0, 0, 1, 1, 1], degree=2))
            add(Edge.make_bspline(
                [(4.834871539, -0.2138937391), (4.6628835121, 0.0803192816), (4.6628835121, 0.4888999751)],
                knots=[0, 0, 0, 1, 1, 1], degree=2))
            add(Edge.make_bspline(
                [(4.6628835121, 0.4888999751), (4.6628835121, 1.2205038663), (5.2582938389, 1.6439261661)],
                knots=[0, 0, 0, 1, 1, 1], degree=2))
            add(Edge.make_bspline(
                [(5.2582938389, 1.6439261661), (5.8537041656, 2.067348466), (6.8891244699, 2.067348466)],
                knots=[0, 0, 0, 1, 1, 1], degree=2))
            add(Edge.make_bspline(
                [(6.8891244699, 2.067348466), (7.8547019207, 2.067348466), (8.7783736593, 1.6744824146)],
                knots=[0, 0, 0, 1, 1, 1], degree=2))
            Line((8.7783736593, 1.6744824146), (8.4553504615, 0.9376403093))
            add(Edge.make_bspline(
                [(8.4553504615, 0.9376403093), (7.5561237216, 1.3078074333), (6.8245198304, 1.3078074333)],
                knots=[0, 0, 0, 1, 1, 1], degree=2))
            add(Edge.make_bspline(
                [(6.8245198304, 1.3078074333), (6.1802195061, 1.3078074333), (5.85283113, 1.1061361936)],
                knots=[0, 0, 0, 1, 1, 1], degree=2))
            add(Edge.make_bspline(
                [(5.85283113, 1.1061361936), (5.5254427538, 0.9044649539), (5.5254427538, 0.5500124719)],
                knots=[0, 0, 0, 1, 1, 1], degree=2))
            add(Edge.make_bspline(
                [(5.5254427538, 0.5500124719), (5.5254427538, 0.3090546271), (5.6485407832, 0.1405587428)],
                knots=[0, 0, 0, 1, 1, 1], degree=2))
            add(Edge.make_bspline(
                [(5.6485407832, 0.1405587428), (5.7716388127, -0.0279371414), (6.0440259416, -0.1807183836)],
                knots=[0, 0, 0, 1, 1, 1], degree=2))
            add(Edge.make_bspline(
                [(6.0440259416, -0.1807183836), (6.3164130706, -0.3334996258), (7.0916687453, -0.6233474682)],
                knots=[0, 0, 0, 1, 1, 1], degree=2))
            add(Edge.make_bspline(
                [(7.0916687453, -0.6233474682), (8.1550261911, -1.0109753056), (8.5286854577, -1.4038413569)],
                knots=[0, 0, 0, 1, 1, 1], degree=2))
        make_face(mode=Mode.SUBTRACT)
        with Locations((22.7894122154, 0)):
            Circle(F2_R, mode=Mode.SUBTRACT)
    extrude(amount=F3_DEPTH)


solid = f1.part
